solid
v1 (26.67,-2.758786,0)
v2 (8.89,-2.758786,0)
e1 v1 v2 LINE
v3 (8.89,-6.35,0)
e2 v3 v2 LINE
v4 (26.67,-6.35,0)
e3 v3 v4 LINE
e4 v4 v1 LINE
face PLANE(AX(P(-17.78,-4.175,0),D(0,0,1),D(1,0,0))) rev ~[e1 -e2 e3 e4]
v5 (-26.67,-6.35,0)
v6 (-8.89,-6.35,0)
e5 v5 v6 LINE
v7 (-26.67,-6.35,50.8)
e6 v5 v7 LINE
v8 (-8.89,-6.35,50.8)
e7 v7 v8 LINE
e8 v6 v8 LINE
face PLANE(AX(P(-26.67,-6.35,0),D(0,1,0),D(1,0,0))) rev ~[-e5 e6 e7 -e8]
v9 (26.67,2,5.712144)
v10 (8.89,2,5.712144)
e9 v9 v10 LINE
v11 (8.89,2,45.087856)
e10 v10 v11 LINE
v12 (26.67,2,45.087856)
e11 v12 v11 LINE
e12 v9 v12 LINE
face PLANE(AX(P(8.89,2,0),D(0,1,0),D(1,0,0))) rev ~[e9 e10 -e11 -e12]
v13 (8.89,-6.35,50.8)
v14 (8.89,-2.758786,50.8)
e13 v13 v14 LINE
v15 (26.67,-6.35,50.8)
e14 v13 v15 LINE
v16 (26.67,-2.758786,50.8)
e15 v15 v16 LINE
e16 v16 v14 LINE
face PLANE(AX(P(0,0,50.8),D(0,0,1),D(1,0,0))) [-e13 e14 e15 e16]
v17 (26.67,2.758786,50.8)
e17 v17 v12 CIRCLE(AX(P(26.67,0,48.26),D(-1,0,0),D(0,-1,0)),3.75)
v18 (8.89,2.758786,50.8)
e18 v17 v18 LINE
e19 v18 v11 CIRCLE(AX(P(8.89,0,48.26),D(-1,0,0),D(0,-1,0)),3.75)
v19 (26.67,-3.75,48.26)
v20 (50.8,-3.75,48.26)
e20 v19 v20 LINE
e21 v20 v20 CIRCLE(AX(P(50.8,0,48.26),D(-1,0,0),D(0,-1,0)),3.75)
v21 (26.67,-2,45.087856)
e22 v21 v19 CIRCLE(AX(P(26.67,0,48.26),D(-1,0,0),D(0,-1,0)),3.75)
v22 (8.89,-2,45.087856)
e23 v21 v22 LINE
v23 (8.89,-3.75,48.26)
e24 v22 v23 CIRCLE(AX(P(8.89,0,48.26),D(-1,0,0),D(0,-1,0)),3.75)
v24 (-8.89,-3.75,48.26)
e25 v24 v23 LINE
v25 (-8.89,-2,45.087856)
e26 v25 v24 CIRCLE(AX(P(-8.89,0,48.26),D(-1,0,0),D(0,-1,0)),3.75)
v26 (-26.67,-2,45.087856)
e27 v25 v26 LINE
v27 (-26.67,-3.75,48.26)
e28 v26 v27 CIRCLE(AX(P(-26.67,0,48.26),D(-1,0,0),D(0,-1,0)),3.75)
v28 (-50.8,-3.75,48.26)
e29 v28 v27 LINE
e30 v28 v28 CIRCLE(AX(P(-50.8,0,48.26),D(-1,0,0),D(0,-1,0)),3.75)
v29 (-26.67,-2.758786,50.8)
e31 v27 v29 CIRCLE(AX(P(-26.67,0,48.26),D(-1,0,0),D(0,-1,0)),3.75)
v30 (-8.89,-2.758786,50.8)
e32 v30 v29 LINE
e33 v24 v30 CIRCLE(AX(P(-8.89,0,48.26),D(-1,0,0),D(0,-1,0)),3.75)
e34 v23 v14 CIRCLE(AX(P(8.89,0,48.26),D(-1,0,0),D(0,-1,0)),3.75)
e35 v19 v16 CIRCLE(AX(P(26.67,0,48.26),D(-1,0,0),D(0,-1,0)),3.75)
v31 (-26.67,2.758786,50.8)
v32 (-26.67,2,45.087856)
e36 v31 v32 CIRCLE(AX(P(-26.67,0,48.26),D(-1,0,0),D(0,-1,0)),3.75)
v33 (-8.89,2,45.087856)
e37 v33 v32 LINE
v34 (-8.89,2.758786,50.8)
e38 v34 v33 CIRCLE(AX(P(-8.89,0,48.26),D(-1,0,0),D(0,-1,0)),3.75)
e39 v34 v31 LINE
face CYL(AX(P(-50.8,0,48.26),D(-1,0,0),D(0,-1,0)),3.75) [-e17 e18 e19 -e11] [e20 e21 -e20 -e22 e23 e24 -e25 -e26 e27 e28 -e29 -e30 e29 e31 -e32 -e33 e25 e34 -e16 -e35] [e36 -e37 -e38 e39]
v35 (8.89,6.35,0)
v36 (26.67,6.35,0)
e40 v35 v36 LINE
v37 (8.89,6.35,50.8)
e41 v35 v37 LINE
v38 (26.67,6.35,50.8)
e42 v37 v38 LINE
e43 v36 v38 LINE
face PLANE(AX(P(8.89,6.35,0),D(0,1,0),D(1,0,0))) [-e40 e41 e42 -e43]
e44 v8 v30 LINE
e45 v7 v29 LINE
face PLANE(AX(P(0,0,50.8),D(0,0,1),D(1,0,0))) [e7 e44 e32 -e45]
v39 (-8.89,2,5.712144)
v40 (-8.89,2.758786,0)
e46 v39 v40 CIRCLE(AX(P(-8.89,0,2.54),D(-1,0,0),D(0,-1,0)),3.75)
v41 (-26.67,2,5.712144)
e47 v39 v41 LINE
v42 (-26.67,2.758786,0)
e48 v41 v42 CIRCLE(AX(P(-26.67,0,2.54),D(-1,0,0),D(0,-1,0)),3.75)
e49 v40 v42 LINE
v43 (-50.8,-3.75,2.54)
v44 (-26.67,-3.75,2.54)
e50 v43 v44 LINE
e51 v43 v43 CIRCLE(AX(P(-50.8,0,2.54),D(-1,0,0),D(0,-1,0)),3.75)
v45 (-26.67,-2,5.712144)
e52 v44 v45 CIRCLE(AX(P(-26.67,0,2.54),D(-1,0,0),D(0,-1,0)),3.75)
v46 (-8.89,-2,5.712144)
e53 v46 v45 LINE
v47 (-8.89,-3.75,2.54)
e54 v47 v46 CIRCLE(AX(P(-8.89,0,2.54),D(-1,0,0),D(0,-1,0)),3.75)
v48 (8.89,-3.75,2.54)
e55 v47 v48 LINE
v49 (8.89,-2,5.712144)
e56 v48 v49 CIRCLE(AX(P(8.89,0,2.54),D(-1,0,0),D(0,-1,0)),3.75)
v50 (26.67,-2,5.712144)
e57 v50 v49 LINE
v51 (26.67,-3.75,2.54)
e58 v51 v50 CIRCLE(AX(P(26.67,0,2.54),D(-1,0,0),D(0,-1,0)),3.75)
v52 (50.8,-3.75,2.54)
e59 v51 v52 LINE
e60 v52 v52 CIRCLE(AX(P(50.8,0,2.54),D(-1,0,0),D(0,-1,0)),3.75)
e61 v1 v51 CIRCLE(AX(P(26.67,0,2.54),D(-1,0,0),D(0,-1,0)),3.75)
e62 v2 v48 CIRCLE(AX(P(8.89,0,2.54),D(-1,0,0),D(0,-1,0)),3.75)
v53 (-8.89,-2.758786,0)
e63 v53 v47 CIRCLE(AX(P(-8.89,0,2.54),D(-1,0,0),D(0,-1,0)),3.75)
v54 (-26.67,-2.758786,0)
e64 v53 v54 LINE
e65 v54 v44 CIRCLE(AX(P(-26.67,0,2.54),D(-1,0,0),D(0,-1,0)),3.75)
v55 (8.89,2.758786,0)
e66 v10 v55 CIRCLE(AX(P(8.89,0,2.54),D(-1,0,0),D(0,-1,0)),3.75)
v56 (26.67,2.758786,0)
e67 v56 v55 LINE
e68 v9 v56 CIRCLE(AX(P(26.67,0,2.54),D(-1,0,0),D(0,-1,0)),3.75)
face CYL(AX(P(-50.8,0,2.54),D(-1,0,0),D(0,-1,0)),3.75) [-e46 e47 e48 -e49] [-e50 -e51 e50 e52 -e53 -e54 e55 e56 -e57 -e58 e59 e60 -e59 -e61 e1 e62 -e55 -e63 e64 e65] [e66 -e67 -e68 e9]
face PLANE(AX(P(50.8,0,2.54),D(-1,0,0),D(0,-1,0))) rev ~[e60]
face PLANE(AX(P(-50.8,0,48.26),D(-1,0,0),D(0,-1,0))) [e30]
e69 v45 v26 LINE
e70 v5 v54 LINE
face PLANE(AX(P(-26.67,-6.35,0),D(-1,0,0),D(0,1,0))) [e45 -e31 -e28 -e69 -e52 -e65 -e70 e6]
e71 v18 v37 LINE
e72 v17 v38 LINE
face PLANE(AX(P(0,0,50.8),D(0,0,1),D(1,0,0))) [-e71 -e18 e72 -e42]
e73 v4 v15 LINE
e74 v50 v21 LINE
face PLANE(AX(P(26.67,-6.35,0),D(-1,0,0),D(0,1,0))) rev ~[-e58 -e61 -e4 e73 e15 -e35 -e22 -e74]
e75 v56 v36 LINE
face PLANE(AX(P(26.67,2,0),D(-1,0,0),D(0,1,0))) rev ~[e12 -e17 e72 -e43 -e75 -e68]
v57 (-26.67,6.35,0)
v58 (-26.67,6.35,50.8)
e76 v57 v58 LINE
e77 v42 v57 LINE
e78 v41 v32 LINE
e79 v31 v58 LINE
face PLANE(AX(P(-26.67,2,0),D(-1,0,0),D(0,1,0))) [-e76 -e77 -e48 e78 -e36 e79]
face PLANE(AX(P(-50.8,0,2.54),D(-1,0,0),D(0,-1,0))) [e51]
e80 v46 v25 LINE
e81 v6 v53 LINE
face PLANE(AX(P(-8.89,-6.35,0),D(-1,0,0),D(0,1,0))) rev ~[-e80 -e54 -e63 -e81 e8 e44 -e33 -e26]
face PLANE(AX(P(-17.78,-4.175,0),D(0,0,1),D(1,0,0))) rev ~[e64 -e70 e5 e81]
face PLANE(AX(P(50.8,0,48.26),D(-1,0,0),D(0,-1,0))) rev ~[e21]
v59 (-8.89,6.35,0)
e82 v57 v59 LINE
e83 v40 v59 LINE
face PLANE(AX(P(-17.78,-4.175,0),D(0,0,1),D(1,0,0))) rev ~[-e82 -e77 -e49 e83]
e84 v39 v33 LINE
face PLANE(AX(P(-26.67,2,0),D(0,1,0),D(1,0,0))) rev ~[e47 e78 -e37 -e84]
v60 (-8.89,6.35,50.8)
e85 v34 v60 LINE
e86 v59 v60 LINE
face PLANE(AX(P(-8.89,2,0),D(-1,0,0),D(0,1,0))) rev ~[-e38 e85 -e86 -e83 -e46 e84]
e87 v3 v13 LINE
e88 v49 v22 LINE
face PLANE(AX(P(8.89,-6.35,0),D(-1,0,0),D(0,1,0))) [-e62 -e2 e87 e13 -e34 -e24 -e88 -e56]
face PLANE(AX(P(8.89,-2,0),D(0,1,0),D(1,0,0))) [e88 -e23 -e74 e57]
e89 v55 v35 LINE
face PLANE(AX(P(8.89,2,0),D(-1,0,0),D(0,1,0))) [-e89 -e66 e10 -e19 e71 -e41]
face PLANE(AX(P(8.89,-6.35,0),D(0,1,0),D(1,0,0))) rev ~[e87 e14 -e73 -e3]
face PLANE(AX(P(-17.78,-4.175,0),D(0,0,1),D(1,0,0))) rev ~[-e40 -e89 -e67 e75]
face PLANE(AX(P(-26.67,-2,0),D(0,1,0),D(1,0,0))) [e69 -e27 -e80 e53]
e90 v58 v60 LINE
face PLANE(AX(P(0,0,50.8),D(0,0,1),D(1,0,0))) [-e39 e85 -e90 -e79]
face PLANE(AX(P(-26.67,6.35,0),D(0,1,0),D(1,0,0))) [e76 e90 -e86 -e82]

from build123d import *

# Parameters (mm, degrees)
F0_W     = 24.13
F0_H     = 4
F0_W_2   = 17.78
F1_DEPTH = 5.08
F0_H_2   = 4.35
F2_DEPTH = 50.8
F3_R     = 3.75
F3_W     = 4
F3_H     = 5.08
F4_DEPTH = 101.6
F6_DEPTH = 5.08
F7_R     = 3.75
F7_W     = 4
F7_H     = 5.08
F8_DEPTH = 101.6


with BuildPart() as f1:
    # F0 (on Top) → F1 (new body)
    with BuildSketch(Plane.XY):
        with Locations((38.735, 0)):
            Rectangle(F0_W, F0_H)
        with Locations((17.78, 0)):
            Rectangle(F0_W_2, F0_H)
        Rectangle(F0_W_2, F0_H)
        with Locations((-17.78, 0)):
            Rectangle(F0_W_2, F0_H)
        with Locations((-38.735, 0)):
            Rectangle(F0_W, F0_H)
    extrude(amount=F1_DEPTH)

    # F0 (on Top) → F2 (join)
    with BuildSketch(Plane.XY):
        with Locations((-17.78, -4.175)):
            Rectangle(F0_W_2, F0_H_2)
        with Locations((17.78, -4.175)):
            Rectangle(F0_W_2, F0_H_2)
        with Locations((-17.78, 4.175)):
            Rectangle(F0_W_2, F0_H_2)
        with Locations((17.78, 4.175)):
            Rectangle(F0_W_2, F0_H_2)
    extrude(amount=F2_DEPTH)

    # F3 (on face) → F4 (join)
    with BuildSketch(Plane(origin=(-50.8, 0, 0), x_dir=(0, -1, 0), z_dir=(-1, 0, 0))):
        with Locations((0, 2.54)):
            Circle(F3_R)
        with Locations((0, 2.54)):
            Rectangle(F3_W, F3_H, mode=Mode.SUBTRACT)
    extrude(amount=-F4_DEPTH)

    # F5 (on face) → F6 (join)
    with BuildSketch(Plane.XY.offset(50.8)):
        Polygon((-8.89, -2), (50.8, -2), (50.8, 2), (-50.8, 2), (-50.8, -2), (-26.67, -2), align=None)
    extrude(amount=-F6_DEPTH)

    # F7 (on face) → F8 (join)
    with BuildSketch(Plane(origin=(-50.8, 0, 0), x_dir=(0, -1, 0), z_dir=(-1, 0, 0))):
        with Locations((0, 48.26)):
            Circle(F7_R)
        with Locations((0, 48.26)):
            Rectangle(F7_W, F7_H, mode=Mode.SUBTRACT)
    extrude(amount=-F8_DEPTH)


solid = f1.part
